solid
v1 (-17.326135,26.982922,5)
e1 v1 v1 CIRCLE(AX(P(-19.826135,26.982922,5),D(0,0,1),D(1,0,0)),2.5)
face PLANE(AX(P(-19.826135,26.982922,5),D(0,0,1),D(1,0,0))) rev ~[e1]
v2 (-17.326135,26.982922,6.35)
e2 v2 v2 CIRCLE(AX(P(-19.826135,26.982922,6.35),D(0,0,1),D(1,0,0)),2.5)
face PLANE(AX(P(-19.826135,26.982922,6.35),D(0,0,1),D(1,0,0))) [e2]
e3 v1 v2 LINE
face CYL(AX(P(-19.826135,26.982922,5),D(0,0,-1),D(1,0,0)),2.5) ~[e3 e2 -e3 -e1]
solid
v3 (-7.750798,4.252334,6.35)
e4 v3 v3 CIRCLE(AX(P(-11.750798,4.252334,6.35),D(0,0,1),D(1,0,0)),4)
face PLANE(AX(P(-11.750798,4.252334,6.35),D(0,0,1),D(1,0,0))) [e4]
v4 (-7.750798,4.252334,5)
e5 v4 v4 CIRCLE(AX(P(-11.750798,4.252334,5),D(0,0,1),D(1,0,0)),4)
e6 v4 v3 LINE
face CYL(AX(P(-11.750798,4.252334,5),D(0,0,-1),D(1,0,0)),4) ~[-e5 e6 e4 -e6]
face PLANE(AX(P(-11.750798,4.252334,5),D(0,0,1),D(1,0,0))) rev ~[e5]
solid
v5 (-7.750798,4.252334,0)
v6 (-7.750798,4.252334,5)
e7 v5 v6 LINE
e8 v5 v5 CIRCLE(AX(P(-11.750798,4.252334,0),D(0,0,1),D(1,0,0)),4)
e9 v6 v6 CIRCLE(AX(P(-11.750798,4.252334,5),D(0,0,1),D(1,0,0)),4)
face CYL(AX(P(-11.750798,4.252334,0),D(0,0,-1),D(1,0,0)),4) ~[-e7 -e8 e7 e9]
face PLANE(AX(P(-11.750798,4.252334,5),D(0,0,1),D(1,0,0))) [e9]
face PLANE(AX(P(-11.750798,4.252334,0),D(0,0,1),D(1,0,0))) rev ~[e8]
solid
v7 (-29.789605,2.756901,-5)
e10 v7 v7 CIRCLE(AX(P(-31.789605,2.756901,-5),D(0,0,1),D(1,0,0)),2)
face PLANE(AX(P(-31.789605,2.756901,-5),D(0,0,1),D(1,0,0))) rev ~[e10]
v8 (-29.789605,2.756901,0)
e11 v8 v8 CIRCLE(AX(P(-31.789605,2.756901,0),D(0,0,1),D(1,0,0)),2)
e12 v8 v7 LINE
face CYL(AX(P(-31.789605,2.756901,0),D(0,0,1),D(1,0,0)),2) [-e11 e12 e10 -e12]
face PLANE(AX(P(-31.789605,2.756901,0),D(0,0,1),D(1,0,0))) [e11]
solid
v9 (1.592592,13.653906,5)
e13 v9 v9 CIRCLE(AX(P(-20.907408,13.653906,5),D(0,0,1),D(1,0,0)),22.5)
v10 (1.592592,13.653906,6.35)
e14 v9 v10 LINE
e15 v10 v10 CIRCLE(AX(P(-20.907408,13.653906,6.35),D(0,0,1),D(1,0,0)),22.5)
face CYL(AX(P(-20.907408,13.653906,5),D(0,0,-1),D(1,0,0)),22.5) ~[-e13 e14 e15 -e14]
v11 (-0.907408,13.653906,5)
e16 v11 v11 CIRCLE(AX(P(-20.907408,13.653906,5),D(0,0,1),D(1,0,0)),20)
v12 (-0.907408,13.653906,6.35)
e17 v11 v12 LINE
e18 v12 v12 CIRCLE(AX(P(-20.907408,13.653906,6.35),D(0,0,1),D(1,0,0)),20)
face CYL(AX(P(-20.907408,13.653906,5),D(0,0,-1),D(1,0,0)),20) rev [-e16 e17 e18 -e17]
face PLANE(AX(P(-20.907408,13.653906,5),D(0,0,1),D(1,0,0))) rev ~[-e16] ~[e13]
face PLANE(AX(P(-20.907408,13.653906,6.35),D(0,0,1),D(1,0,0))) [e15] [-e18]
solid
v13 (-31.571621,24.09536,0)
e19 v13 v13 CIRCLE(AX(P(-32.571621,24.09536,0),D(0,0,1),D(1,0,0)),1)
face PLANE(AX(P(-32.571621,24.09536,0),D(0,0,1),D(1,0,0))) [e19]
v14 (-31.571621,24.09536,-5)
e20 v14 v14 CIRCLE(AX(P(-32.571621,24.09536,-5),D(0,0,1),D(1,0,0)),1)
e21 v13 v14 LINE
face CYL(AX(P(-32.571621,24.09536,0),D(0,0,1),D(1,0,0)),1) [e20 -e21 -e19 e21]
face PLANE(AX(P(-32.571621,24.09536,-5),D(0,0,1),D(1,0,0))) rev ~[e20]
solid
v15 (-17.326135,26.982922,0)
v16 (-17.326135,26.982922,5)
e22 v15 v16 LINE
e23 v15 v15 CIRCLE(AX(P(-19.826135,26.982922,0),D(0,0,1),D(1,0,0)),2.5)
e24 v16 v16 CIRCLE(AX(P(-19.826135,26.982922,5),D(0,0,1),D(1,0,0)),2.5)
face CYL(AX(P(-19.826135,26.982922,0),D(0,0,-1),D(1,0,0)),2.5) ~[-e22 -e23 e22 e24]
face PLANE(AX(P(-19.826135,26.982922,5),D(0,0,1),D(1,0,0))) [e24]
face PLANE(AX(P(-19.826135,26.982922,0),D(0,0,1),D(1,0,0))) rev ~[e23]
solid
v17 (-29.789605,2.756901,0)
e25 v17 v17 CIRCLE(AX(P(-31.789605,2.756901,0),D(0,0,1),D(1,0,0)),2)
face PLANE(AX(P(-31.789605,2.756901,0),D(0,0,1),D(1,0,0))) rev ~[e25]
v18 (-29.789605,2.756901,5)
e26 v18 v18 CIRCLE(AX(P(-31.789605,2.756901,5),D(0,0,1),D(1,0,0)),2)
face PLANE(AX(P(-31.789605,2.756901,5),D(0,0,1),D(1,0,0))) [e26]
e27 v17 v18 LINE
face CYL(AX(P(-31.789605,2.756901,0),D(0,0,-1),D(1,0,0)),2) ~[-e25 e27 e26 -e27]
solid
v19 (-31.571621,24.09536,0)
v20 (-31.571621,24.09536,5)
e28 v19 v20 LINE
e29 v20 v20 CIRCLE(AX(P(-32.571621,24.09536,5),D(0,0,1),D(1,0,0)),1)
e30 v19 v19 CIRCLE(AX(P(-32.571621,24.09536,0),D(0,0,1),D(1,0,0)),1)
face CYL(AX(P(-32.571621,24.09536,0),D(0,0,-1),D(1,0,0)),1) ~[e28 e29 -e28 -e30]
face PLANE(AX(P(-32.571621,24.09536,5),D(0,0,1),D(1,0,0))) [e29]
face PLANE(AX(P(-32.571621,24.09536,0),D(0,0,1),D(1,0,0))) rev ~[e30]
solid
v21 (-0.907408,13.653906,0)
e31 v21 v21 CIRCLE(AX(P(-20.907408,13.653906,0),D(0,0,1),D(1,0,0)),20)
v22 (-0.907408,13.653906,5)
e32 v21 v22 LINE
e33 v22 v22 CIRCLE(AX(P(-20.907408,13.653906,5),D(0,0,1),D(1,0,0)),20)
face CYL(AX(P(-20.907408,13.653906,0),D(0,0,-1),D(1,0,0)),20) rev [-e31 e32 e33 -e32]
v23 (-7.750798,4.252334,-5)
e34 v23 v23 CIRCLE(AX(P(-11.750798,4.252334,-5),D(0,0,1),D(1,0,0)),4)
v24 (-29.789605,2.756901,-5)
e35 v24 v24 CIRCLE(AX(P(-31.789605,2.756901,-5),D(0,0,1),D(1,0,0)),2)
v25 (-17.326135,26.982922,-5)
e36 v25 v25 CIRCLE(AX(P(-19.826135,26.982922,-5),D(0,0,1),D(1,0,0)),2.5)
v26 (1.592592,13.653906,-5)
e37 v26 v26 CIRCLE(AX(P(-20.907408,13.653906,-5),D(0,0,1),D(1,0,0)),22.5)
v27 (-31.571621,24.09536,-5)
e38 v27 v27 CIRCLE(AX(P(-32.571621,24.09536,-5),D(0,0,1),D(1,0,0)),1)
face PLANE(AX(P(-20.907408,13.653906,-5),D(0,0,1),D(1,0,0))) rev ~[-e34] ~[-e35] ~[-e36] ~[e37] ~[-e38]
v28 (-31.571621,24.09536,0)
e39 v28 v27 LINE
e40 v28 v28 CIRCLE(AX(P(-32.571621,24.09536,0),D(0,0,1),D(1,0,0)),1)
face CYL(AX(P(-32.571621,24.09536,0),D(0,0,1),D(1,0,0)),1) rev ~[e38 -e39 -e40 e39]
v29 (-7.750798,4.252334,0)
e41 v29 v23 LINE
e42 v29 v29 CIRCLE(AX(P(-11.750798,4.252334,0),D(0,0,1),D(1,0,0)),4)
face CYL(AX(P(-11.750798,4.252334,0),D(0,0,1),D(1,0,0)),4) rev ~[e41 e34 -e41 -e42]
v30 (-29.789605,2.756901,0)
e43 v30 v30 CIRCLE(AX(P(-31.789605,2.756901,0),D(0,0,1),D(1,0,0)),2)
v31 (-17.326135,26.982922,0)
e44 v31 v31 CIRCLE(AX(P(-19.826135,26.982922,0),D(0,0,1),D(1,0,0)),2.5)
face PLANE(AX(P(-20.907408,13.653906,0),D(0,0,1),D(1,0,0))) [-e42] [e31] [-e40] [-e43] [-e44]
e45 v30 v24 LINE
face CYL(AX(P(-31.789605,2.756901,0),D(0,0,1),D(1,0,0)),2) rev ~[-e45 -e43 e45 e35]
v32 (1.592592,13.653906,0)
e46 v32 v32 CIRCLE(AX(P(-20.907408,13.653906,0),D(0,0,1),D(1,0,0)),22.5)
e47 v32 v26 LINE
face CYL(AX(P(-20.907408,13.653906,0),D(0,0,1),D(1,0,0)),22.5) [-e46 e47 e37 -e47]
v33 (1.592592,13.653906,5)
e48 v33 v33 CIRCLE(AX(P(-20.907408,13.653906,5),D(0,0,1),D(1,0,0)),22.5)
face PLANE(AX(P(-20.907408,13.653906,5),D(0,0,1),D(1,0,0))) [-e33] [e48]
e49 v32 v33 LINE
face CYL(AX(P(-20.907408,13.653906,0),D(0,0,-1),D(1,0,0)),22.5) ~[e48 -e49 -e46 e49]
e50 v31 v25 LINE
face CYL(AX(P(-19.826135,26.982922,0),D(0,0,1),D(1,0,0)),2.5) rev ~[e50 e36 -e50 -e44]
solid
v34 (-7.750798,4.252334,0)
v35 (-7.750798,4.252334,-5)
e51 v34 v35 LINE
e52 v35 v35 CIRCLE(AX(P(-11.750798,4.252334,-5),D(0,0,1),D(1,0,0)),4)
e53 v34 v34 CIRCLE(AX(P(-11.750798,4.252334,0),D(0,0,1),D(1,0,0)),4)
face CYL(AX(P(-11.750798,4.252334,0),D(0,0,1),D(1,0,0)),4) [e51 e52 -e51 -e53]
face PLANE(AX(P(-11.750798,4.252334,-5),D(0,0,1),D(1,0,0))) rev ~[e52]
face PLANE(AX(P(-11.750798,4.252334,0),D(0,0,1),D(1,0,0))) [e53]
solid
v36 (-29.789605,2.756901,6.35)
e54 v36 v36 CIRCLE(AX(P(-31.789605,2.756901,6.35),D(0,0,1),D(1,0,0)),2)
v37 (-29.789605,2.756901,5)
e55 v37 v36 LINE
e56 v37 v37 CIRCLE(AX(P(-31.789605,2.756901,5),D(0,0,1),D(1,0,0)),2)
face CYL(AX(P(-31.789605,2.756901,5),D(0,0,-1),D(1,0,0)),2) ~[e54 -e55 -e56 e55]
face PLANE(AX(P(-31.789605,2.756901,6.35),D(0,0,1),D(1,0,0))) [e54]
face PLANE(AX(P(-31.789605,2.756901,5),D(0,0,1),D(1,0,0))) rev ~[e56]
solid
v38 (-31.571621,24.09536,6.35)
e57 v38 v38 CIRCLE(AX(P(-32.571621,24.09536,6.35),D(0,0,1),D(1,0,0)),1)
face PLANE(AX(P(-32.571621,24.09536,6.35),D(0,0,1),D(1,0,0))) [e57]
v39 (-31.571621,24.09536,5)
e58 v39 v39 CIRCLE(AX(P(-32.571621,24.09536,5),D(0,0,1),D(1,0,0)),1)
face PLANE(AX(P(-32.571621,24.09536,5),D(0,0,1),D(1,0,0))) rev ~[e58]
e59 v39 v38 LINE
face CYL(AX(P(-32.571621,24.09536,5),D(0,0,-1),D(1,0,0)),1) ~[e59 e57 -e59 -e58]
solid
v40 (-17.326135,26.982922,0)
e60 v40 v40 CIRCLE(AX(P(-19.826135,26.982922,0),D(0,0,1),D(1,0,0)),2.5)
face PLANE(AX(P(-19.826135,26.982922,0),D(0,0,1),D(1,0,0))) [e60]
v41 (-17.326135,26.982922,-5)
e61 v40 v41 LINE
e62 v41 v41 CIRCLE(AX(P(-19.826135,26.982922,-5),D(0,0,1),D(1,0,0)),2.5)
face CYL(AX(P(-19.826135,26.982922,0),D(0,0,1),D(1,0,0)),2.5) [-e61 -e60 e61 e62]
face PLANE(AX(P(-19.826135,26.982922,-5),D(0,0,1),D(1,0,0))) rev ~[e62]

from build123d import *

# Parameters (mm, degrees)
F0_R        = 22.5
F0_R_2      = 20
F1_DEPTH    = 5
F0_R_3      = 4
F0_R_4      = 2.5
F0_R_5      = 1
F0_R_6      = 2
F1_FACE_R   = 22.5
F1_FACE_R_2 = 20
F2_DEPTH    = 5
F5_DEPTH    = 5
F6_DEPTH    = 1.35


# Not quite as in the source:
# - a feature of the source that left no trace in its solid (it failed there, or was rolled back) is left out
# - the program builds the solid bodies; features that only make, move or delete a surface that nothing else refers to are left out


with BuildPart() as f1:
    # F0 (on Top) → F1 (new body)
    with BuildSketch(Plane.XY):
        with Locations((-20.9074081164, 13.653905517)):
            Circle(F0_R)
        with Locations((-20.9074081164, 13.653905517)):
            Circle(F0_R_2, mode=Mode.SUBTRACT)
    extrude(amount=F1_DEPTH)

    # F1_face (on face) + F0 (on Top) → F2 (join)
    with BuildSketch(Plane(origin=(-20.9074081164, 13.653905517, 5), x_dir=(1, 0, 0), z_dir=(0, 0, 1))):
        Circle(F1_FACE_R)
        Circle(F1_FACE_R_2, mode=Mode.SUBTRACT)
    with BuildSketch(Plane.XY):
        with Locations((-20.9074081164, 13.653905517)):
            Circle(F0_R)
        with Locations((-20.9074081164, 13.653905517)):
            Circle(F0_R_2, mode=Mode.SUBTRACT)
        with Locations((-20.9074081164, 13.653905517)):
            Circle(F0_R_2)
        with Locations((-31.7896045744, 2.7569008525)):
            Circle(F0_R_6, mode=Mode.SUBTRACT)
        with Locations((-11.7507977411, 4.2523336597)):
            Circle(F0_R_3, mode=Mode.SUBTRACT)
        with Locations((-32.5716212392, 24.0953601897)):
            Circle(F0_R_5, mode=Mode.SUBTRACT)
        with Locations((-19.8261346668, 26.982922107)):
            Circle(F0_R_4, mode=Mode.SUBTRACT)
    extrude(amount=-F2_DEPTH)


with BuildPart() as f1b:
    # F0 (on Top) → F1, piece 2 (new body)
    with BuildSketch(Plane.XY):
        with Locations((-11.7507977411, 4.2523336597)):
            Circle(F0_R_3)
    extrude(amount=F1_DEPTH)


with BuildPart() as f1c:
    # F0 (on Top) → F1, piece 3 (new body)
    with BuildSketch(Plane.XY):
        with Locations((-19.8261346668, 26.982922107)):
            Circle(F0_R_4)
    extrude(amount=F1_DEPTH)


with BuildPart() as f1d:
    # F0 (on Top) → F1, piece 4 (new body)
    with BuildSketch(Plane.XY):
        with Locations((-32.5716212392, 24.0953601897)):
            Circle(F0_R_5)
    extrude(amount=F1_DEPTH)


with BuildPart() as f1e:
    # F0 (on Top) → F1, piece 5 (new body)
    with BuildSketch(Plane.XY):
        with Locations((-31.7896045744, 2.7569008525)):
            Circle(F0_R_6)
    extrude(amount=F1_DEPTH)


with BuildPart() as f5:
    # F0 (on Top) → F5 (new body)
    with BuildSketch(Plane.XY):
        with Locations((-11.7507977411, 4.2523336597)):
            Circle(F0_R_3)
    extrude(amount=-F5_DEPTH)


with BuildPart() as f5b:
    # F0 (on Top) → F5, piece 2 (new body)
    with BuildSketch(Plane.XY):
        with Locations((-31.7896045744, 2.7569008525)):
            Circle(F0_R_6)
    extrude(amount=-F5_DEPTH)


with BuildPart() as f5c:
    # F0 (on Top) → F5, piece 3 (new body)
    with BuildSketch(Plane.XY):
        with Locations((-32.5716212392, 24.0953601897)):
            Circle(F0_R_5)
    extrude(amount=-F5_DEPTH)


with BuildPart() as f5d:
    # F0 (on Top) → F5, piece 4 (new body)
    with BuildSketch(Plane.XY):
        with Locations((-19.8261346668, 26.982922107)):
            Circle(F0_R_4)
    extrude(amount=-F5_DEPTH)


with BuildPart() as f6:
    # F6 (new): a face of the model
    f6_faces = [f1.part.faces().sort_by_distance(p)[0] for p in [
        (-42.7710120133, 13.653905517, 5),
    ]]
    extrude(f6_faces, amount=F6_DEPTH)


with BuildPart() as f6b:
    # F6#2 (new): a face of the model
    f6_2_faces = [f1e.part.faces().sort_by_distance(p)[0] for p in [
        (-31.7896045744, 2.7569008525, 5),
    ]]
    extrude(f6_2_faces, amount=F6_DEPTH)


with BuildPart() as f6c:
    # F6#3 (new): a face of the model
    f6_3_faces = [f1d.part.faces().sort_by_distance(p)[0] for p in [
        (-32.5716212392, 24.0953601897, 5),
    ]]
    extrude(f6_3_faces, amount=F6_DEPTH)


with BuildPart() as f6d:
    # F6#4 (new): a face of the model
    f6_4_faces = [f1b.part.faces().sort_by_distance(p)[0] for p in [
        (-11.7507977411, 4.2523336597, 5),
    ]]
    extrude(f6_4_faces, amount=F6_DEPTH)


with BuildPart() as f6e:
    # F6#5 (new): a face of the model
    f6_5_faces = [f1c.part.faces().sort_by_distance(p)[0] for p in [
        (-19.8261346668, 26.982922107, 5),
    ]]
    extrude(f6_5_faces, amount=F6_DEPTH)


solid = Compound([f1.part, f1b.part, f1c.part, f1d.part, f1e.part, f5.part, f5b.part, f5c.part, f5d.part, f6.part, f6b.part, f6c.part, f6d.part, f6e.part])
